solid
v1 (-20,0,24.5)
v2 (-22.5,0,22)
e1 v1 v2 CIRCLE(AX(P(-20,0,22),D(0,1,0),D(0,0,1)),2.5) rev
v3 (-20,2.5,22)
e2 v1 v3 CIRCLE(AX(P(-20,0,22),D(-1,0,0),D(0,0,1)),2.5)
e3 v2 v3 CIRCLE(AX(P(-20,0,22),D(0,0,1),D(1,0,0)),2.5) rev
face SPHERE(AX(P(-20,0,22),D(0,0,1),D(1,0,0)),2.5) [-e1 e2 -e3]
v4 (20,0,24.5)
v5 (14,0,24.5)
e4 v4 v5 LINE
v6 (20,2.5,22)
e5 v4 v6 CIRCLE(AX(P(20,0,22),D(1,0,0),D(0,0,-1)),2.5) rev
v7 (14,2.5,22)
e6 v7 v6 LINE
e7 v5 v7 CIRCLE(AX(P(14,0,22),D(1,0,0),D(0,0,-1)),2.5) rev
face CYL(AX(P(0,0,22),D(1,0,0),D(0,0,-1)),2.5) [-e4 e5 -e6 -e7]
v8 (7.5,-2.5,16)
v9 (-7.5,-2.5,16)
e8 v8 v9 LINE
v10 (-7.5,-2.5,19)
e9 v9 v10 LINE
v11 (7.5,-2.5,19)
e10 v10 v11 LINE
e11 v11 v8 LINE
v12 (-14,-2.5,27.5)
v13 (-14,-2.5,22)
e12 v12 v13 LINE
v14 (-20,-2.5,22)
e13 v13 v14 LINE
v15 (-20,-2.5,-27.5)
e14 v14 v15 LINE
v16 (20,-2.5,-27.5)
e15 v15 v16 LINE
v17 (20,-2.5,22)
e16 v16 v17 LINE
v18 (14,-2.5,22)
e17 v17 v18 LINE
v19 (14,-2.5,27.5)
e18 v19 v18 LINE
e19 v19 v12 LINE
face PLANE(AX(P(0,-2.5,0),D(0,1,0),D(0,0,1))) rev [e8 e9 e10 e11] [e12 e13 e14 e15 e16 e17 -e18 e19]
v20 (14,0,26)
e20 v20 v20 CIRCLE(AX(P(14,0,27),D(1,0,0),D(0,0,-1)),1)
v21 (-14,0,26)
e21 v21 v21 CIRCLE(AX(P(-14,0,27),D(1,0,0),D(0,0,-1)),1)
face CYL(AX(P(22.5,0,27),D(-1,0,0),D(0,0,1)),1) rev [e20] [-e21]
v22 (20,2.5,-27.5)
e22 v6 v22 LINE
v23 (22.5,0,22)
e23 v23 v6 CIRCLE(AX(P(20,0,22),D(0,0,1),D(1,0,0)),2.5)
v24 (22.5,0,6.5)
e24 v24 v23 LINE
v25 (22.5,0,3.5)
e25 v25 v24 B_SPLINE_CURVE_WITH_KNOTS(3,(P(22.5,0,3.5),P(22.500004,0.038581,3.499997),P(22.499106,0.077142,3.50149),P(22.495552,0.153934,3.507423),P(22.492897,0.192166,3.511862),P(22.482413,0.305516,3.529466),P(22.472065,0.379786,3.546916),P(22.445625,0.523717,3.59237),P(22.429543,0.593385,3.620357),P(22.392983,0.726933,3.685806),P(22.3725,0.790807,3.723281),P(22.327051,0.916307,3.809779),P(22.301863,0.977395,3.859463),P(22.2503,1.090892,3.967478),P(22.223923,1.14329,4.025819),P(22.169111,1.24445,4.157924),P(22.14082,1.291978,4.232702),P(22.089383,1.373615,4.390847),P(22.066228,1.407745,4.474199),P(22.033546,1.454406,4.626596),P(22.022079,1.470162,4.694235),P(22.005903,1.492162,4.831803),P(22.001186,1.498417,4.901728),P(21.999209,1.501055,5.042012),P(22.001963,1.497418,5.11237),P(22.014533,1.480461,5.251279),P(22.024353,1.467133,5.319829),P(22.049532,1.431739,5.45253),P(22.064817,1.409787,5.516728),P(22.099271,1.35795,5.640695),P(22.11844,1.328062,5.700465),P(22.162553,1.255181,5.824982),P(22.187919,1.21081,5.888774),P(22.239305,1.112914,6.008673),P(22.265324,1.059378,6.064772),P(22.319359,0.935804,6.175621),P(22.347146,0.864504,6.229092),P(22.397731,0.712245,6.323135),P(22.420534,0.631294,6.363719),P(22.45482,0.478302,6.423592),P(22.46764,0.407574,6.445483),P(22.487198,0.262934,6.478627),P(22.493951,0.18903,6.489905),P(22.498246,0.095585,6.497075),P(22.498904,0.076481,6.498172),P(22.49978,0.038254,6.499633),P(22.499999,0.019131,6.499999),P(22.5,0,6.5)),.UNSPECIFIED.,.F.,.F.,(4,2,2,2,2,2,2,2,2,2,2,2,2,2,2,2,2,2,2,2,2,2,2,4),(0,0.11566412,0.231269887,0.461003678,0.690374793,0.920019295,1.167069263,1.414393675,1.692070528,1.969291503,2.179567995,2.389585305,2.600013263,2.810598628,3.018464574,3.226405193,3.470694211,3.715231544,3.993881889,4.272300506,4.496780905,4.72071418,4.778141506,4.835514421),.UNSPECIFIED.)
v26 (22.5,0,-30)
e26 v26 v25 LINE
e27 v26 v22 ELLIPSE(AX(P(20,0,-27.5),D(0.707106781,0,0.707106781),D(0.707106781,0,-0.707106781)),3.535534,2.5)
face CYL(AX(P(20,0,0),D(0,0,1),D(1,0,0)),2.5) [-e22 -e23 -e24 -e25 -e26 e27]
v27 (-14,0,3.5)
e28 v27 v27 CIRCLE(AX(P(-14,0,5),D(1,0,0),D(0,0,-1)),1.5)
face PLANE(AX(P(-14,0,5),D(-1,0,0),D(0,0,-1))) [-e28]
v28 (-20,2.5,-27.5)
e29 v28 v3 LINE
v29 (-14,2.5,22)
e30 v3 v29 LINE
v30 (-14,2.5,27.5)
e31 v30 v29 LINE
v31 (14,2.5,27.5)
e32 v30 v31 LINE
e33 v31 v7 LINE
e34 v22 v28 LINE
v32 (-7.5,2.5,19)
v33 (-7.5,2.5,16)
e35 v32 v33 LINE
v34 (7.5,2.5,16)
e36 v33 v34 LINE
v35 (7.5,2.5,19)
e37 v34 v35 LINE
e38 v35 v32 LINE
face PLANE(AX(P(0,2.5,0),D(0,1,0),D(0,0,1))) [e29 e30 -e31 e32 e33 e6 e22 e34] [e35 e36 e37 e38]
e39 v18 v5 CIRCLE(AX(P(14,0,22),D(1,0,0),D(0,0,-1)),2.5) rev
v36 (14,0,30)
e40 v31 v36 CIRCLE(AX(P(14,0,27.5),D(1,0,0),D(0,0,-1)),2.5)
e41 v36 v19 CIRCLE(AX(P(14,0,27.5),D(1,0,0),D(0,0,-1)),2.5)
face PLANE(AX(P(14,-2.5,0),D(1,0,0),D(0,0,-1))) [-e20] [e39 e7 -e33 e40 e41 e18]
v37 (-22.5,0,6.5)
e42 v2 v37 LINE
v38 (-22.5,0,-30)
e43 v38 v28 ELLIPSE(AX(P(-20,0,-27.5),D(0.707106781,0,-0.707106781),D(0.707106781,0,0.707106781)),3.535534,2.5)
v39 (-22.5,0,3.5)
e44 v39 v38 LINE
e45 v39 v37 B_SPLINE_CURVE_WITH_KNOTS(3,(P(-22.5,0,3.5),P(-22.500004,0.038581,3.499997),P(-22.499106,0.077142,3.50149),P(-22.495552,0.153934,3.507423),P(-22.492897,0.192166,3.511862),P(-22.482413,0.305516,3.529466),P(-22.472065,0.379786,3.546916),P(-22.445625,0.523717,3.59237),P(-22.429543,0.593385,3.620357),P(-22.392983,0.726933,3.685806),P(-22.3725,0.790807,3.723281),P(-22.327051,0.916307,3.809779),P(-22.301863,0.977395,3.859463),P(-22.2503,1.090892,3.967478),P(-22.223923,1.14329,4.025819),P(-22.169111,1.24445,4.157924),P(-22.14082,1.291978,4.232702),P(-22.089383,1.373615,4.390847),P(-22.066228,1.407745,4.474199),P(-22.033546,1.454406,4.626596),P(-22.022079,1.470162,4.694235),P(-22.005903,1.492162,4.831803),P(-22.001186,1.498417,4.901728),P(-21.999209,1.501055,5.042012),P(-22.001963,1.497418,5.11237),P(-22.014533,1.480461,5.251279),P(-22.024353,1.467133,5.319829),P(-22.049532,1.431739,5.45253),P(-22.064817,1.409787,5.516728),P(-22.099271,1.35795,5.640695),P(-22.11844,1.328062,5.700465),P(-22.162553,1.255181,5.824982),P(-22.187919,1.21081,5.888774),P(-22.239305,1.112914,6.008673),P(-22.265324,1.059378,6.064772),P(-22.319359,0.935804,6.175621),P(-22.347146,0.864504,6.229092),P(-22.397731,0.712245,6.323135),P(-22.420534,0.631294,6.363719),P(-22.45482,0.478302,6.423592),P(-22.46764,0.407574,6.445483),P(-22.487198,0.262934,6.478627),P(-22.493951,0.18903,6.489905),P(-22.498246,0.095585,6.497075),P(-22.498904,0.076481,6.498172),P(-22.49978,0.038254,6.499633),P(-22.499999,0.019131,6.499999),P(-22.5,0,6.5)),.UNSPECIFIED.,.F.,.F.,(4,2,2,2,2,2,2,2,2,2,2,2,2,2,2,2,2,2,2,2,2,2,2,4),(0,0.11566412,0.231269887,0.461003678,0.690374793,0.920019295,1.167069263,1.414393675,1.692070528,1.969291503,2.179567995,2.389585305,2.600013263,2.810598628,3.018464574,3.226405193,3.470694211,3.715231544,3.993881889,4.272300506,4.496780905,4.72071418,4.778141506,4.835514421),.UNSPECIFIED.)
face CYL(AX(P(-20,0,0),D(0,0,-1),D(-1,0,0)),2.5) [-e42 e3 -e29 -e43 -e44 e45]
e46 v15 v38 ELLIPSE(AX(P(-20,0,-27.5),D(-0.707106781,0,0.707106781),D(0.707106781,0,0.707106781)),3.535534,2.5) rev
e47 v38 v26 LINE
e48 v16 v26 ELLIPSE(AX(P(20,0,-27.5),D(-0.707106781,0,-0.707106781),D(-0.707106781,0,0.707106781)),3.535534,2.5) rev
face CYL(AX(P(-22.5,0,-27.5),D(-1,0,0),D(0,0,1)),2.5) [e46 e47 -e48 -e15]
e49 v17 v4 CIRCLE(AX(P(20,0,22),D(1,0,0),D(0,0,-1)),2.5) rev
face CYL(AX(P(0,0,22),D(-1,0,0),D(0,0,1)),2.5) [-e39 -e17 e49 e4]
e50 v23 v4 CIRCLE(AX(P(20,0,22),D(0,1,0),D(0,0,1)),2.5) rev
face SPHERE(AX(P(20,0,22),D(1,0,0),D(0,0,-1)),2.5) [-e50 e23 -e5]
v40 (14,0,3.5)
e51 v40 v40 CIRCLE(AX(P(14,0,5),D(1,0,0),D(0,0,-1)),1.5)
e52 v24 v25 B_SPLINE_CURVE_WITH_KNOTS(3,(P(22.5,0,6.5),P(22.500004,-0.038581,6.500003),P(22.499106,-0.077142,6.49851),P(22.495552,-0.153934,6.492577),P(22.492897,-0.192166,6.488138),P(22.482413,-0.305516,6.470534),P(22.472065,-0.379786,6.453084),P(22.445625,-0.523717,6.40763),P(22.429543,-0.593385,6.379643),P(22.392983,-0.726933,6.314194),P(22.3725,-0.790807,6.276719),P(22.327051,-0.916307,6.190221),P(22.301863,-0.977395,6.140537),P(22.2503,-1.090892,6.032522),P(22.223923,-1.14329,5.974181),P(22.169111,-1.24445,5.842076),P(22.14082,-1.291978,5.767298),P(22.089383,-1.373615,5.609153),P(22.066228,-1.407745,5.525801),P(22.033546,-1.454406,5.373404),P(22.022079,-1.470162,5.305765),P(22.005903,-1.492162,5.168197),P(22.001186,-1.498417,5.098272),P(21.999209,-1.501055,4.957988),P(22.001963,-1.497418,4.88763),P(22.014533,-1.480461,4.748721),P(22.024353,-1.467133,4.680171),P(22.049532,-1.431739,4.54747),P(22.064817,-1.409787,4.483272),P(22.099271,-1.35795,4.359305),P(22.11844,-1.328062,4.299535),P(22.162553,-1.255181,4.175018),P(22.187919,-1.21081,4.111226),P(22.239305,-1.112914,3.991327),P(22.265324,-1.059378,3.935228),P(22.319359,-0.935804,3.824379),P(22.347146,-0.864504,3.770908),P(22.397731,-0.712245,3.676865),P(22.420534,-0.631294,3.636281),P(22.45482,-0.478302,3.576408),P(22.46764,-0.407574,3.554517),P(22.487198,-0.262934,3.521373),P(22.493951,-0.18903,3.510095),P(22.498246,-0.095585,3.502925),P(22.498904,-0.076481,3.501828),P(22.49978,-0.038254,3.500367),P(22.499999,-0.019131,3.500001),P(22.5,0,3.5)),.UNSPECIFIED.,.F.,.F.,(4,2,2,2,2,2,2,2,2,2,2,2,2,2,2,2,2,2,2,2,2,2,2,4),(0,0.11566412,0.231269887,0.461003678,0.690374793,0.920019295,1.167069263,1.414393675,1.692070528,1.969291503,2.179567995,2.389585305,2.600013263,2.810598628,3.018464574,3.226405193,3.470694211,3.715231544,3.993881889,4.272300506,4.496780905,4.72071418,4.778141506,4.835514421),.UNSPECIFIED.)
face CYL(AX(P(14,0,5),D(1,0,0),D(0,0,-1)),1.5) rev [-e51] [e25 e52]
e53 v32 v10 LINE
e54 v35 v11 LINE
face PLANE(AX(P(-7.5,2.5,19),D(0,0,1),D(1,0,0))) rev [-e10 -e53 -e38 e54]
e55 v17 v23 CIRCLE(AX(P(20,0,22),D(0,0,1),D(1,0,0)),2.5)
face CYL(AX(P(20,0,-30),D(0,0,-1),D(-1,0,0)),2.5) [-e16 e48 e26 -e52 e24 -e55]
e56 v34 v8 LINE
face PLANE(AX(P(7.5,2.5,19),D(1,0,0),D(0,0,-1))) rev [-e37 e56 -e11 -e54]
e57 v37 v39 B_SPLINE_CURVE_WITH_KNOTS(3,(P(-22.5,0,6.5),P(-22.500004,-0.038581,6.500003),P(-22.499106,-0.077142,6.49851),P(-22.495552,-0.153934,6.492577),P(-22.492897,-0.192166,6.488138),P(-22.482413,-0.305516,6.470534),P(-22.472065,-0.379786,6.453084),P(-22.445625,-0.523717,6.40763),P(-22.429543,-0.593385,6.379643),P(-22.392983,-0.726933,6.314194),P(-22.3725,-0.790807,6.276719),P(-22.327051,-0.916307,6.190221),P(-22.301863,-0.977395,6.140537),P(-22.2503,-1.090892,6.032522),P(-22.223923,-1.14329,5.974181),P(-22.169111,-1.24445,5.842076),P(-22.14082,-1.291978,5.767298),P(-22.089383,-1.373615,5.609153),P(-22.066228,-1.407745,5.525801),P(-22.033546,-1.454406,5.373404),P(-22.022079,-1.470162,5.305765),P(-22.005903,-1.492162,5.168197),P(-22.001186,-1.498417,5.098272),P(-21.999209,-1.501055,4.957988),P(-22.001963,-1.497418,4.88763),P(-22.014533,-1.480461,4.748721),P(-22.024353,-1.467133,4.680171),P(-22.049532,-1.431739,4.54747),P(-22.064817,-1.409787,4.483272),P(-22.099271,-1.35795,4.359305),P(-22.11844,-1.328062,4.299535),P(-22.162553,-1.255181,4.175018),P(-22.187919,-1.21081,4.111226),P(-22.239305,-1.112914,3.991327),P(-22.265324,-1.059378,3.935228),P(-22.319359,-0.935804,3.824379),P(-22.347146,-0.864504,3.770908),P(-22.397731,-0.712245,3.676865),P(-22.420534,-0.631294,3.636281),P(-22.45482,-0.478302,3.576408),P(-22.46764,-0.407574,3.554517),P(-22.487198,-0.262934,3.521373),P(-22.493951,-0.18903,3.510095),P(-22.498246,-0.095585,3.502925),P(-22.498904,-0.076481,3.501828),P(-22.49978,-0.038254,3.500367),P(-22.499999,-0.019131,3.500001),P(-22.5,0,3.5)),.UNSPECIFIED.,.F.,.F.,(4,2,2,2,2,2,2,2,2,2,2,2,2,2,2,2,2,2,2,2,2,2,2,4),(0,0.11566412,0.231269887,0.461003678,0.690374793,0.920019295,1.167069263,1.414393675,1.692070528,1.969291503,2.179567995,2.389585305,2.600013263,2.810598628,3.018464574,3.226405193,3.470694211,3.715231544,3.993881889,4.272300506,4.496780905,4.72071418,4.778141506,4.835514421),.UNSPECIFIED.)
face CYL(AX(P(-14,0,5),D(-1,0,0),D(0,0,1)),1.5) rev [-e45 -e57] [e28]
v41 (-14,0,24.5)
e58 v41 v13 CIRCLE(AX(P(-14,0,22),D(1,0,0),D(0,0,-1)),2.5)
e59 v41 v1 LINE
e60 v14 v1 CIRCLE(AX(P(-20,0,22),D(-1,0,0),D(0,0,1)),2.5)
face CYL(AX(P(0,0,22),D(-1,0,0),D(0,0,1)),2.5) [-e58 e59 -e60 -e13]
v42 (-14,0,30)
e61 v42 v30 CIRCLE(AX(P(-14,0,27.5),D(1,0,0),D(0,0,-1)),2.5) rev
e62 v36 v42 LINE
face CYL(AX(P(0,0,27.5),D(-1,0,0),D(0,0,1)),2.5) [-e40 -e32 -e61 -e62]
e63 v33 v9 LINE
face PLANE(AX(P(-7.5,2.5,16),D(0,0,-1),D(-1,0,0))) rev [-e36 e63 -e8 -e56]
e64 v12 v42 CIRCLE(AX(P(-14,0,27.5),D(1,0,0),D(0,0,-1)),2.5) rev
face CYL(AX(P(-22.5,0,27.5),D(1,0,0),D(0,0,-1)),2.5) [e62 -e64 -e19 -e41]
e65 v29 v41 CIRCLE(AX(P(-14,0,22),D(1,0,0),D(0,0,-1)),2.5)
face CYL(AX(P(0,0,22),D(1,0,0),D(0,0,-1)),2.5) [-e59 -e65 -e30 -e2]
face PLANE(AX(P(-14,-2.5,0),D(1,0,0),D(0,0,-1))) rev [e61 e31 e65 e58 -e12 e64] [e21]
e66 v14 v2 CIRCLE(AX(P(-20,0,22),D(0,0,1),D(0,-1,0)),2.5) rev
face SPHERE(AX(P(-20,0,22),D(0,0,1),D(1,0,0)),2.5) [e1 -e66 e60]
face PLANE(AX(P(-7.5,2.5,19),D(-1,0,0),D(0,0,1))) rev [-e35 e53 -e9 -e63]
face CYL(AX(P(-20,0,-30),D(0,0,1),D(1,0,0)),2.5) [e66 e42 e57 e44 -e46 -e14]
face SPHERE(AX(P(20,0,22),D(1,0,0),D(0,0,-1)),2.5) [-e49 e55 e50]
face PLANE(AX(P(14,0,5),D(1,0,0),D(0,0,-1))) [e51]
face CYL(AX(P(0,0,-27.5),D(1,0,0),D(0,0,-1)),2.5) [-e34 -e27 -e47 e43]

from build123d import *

# Parameters (mm, degrees)
SKETCH1_W               = 45
SKETCH1_H               = 60
BOSS_EXTRUDE1_DEPTH     = 2.5
CUT_EXTRUDE1_DEPTH      = 38.831864876
CUT_EXTRUDE1_DEPTH_BACK = 38.831864876
SKETCH2_W               = 8.5
SKETCH2_H               = 5.5
CUT_EXTRUDE2_DEPTH      = 48.312788969
CUT_EXTRUDE2_DEPTH_BACK = 48.312788969
SKETCH9_R               = 1
FILLET1_R               = 2.5
CUT_EXTRUDE3_DEPTH      = 38.831864876
CUT_EXTRUDE3_DEPTH_BACK = 38.831864876
SKETCH13_W              = 15
SKETCH13_H              = 3
CUT_EXTRUDE4_START      = -6
SKETCH11_R              = 1.5
CUT_EXTRUDE4_DEPTH      = 59.08166664


with BuildPart() as part:
    # Sketch1 → Boss-Extrude1 (new, symmetric)
    with BuildSketch(Plane(origin=(0, 0, 0), x_dir=(1, 0, 0), z_dir=(0, 1, 0))):
        Rectangle(SKETCH1_W, SKETCH1_H)
    extrude(amount=BOSS_EXTRUDE1_DEPTH, both=True)

    # Sketch2 → Cut-Extrude1 (cut, two sides: drawn at the far end of the back side and taken through both)
    with BuildSketch(Plane(origin=(0, 2.5, 0), x_dir=(1, 0, 0), z_dir=(0, 1, 0)).offset(-CUT_EXTRUDE1_DEPTH_BACK)):
        with Locations((-18.25, -27.25)):
            Rectangle(SKETCH2_W, SKETCH2_H)
        with Locations((18.25, -27.25)):
            Rectangle(SKETCH2_W, SKETCH2_H)
    extrude(amount=CUT_EXTRUDE1_DEPTH + CUT_EXTRUDE1_DEPTH_BACK, mode=Mode.SUBTRACT)

    # Sketch9 → Cut-Extrude2 (cut, two sides: drawn at the far end of the back side and taken through both)
    with BuildSketch(Plane.ZY.offset(14).offset(-CUT_EXTRUDE2_DEPTH_BACK)):
        with Locations(Location((27, 0, 0), (0, 0, 180))):
            Circle(SKETCH9_R)
    extrude(amount=CUT_EXTRUDE2_DEPTH + CUT_EXTRUDE2_DEPTH_BACK, mode=Mode.SUBTRACT)

    # Fillet1
    fillet1_edges = [part.edges().sort_by_distance(p)[0] for p in [
        (-22.5, 2.5, -2.75),
        (22.5, -2.5, -2.75),
        (0, -2.5, 30),
        (22.5, 2.5, -2.75),
        (0, 2.5, 30),
        (-18.25, 2.5, 24.5),
        (-18.25, -2.5, 24.5),
        (-22.5, 0, 24.5),
        (18.25, 2.5, 24.5),
        (22.5, 0, 24.5),
        (18.25, -2.5, 24.5),
        (-22.5, -2.5, -2.75),
        (0, -2.5, -30),
        (0, 2.5, -30),
    ]]
    fillet(fillet1_edges, radius=FILLET1_R - 0.0001)  # a hair under: the kernel refuses the full size

    # Sketch13 → Cut-Extrude3 (cut, two sides: drawn at the far end of the back side and taken through both)
    with BuildSketch(Plane.XZ.offset(2.5).offset(-CUT_EXTRUDE3_DEPTH_BACK)):
        with Locations((0, 17.5)):
            Rectangle(SKETCH13_W, SKETCH13_H)
    extrude(amount=CUT_EXTRUDE3_DEPTH + CUT_EXTRUDE3_DEPTH_BACK, mode=Mode.SUBTRACT)

    # Sketch11 → Cut-Extrude4 (cut)
    with BuildSketch(Plane(origin=(20, 0, 0), x_dir=(0, 0, -1), z_dir=(1, 0, 0)).offset(CUT_EXTRUDE4_START)):
        with Locations((-5, 0)):
            Circle(SKETCH11_R)
    cut_extrude4 = extrude(amount=CUT_EXTRUDE4_DEPTH, mode=Mode.SUBTRACT)

    # Mirror1: Cut-Extrude4 across plane
    add(cut_extrude4.mirror(Plane(origin=(0, 0, 0), x_dir=(0, 0, 1), z_dir=(1, 0, 0))), mode=Mode.SUBTRACT)


solid = part.part
